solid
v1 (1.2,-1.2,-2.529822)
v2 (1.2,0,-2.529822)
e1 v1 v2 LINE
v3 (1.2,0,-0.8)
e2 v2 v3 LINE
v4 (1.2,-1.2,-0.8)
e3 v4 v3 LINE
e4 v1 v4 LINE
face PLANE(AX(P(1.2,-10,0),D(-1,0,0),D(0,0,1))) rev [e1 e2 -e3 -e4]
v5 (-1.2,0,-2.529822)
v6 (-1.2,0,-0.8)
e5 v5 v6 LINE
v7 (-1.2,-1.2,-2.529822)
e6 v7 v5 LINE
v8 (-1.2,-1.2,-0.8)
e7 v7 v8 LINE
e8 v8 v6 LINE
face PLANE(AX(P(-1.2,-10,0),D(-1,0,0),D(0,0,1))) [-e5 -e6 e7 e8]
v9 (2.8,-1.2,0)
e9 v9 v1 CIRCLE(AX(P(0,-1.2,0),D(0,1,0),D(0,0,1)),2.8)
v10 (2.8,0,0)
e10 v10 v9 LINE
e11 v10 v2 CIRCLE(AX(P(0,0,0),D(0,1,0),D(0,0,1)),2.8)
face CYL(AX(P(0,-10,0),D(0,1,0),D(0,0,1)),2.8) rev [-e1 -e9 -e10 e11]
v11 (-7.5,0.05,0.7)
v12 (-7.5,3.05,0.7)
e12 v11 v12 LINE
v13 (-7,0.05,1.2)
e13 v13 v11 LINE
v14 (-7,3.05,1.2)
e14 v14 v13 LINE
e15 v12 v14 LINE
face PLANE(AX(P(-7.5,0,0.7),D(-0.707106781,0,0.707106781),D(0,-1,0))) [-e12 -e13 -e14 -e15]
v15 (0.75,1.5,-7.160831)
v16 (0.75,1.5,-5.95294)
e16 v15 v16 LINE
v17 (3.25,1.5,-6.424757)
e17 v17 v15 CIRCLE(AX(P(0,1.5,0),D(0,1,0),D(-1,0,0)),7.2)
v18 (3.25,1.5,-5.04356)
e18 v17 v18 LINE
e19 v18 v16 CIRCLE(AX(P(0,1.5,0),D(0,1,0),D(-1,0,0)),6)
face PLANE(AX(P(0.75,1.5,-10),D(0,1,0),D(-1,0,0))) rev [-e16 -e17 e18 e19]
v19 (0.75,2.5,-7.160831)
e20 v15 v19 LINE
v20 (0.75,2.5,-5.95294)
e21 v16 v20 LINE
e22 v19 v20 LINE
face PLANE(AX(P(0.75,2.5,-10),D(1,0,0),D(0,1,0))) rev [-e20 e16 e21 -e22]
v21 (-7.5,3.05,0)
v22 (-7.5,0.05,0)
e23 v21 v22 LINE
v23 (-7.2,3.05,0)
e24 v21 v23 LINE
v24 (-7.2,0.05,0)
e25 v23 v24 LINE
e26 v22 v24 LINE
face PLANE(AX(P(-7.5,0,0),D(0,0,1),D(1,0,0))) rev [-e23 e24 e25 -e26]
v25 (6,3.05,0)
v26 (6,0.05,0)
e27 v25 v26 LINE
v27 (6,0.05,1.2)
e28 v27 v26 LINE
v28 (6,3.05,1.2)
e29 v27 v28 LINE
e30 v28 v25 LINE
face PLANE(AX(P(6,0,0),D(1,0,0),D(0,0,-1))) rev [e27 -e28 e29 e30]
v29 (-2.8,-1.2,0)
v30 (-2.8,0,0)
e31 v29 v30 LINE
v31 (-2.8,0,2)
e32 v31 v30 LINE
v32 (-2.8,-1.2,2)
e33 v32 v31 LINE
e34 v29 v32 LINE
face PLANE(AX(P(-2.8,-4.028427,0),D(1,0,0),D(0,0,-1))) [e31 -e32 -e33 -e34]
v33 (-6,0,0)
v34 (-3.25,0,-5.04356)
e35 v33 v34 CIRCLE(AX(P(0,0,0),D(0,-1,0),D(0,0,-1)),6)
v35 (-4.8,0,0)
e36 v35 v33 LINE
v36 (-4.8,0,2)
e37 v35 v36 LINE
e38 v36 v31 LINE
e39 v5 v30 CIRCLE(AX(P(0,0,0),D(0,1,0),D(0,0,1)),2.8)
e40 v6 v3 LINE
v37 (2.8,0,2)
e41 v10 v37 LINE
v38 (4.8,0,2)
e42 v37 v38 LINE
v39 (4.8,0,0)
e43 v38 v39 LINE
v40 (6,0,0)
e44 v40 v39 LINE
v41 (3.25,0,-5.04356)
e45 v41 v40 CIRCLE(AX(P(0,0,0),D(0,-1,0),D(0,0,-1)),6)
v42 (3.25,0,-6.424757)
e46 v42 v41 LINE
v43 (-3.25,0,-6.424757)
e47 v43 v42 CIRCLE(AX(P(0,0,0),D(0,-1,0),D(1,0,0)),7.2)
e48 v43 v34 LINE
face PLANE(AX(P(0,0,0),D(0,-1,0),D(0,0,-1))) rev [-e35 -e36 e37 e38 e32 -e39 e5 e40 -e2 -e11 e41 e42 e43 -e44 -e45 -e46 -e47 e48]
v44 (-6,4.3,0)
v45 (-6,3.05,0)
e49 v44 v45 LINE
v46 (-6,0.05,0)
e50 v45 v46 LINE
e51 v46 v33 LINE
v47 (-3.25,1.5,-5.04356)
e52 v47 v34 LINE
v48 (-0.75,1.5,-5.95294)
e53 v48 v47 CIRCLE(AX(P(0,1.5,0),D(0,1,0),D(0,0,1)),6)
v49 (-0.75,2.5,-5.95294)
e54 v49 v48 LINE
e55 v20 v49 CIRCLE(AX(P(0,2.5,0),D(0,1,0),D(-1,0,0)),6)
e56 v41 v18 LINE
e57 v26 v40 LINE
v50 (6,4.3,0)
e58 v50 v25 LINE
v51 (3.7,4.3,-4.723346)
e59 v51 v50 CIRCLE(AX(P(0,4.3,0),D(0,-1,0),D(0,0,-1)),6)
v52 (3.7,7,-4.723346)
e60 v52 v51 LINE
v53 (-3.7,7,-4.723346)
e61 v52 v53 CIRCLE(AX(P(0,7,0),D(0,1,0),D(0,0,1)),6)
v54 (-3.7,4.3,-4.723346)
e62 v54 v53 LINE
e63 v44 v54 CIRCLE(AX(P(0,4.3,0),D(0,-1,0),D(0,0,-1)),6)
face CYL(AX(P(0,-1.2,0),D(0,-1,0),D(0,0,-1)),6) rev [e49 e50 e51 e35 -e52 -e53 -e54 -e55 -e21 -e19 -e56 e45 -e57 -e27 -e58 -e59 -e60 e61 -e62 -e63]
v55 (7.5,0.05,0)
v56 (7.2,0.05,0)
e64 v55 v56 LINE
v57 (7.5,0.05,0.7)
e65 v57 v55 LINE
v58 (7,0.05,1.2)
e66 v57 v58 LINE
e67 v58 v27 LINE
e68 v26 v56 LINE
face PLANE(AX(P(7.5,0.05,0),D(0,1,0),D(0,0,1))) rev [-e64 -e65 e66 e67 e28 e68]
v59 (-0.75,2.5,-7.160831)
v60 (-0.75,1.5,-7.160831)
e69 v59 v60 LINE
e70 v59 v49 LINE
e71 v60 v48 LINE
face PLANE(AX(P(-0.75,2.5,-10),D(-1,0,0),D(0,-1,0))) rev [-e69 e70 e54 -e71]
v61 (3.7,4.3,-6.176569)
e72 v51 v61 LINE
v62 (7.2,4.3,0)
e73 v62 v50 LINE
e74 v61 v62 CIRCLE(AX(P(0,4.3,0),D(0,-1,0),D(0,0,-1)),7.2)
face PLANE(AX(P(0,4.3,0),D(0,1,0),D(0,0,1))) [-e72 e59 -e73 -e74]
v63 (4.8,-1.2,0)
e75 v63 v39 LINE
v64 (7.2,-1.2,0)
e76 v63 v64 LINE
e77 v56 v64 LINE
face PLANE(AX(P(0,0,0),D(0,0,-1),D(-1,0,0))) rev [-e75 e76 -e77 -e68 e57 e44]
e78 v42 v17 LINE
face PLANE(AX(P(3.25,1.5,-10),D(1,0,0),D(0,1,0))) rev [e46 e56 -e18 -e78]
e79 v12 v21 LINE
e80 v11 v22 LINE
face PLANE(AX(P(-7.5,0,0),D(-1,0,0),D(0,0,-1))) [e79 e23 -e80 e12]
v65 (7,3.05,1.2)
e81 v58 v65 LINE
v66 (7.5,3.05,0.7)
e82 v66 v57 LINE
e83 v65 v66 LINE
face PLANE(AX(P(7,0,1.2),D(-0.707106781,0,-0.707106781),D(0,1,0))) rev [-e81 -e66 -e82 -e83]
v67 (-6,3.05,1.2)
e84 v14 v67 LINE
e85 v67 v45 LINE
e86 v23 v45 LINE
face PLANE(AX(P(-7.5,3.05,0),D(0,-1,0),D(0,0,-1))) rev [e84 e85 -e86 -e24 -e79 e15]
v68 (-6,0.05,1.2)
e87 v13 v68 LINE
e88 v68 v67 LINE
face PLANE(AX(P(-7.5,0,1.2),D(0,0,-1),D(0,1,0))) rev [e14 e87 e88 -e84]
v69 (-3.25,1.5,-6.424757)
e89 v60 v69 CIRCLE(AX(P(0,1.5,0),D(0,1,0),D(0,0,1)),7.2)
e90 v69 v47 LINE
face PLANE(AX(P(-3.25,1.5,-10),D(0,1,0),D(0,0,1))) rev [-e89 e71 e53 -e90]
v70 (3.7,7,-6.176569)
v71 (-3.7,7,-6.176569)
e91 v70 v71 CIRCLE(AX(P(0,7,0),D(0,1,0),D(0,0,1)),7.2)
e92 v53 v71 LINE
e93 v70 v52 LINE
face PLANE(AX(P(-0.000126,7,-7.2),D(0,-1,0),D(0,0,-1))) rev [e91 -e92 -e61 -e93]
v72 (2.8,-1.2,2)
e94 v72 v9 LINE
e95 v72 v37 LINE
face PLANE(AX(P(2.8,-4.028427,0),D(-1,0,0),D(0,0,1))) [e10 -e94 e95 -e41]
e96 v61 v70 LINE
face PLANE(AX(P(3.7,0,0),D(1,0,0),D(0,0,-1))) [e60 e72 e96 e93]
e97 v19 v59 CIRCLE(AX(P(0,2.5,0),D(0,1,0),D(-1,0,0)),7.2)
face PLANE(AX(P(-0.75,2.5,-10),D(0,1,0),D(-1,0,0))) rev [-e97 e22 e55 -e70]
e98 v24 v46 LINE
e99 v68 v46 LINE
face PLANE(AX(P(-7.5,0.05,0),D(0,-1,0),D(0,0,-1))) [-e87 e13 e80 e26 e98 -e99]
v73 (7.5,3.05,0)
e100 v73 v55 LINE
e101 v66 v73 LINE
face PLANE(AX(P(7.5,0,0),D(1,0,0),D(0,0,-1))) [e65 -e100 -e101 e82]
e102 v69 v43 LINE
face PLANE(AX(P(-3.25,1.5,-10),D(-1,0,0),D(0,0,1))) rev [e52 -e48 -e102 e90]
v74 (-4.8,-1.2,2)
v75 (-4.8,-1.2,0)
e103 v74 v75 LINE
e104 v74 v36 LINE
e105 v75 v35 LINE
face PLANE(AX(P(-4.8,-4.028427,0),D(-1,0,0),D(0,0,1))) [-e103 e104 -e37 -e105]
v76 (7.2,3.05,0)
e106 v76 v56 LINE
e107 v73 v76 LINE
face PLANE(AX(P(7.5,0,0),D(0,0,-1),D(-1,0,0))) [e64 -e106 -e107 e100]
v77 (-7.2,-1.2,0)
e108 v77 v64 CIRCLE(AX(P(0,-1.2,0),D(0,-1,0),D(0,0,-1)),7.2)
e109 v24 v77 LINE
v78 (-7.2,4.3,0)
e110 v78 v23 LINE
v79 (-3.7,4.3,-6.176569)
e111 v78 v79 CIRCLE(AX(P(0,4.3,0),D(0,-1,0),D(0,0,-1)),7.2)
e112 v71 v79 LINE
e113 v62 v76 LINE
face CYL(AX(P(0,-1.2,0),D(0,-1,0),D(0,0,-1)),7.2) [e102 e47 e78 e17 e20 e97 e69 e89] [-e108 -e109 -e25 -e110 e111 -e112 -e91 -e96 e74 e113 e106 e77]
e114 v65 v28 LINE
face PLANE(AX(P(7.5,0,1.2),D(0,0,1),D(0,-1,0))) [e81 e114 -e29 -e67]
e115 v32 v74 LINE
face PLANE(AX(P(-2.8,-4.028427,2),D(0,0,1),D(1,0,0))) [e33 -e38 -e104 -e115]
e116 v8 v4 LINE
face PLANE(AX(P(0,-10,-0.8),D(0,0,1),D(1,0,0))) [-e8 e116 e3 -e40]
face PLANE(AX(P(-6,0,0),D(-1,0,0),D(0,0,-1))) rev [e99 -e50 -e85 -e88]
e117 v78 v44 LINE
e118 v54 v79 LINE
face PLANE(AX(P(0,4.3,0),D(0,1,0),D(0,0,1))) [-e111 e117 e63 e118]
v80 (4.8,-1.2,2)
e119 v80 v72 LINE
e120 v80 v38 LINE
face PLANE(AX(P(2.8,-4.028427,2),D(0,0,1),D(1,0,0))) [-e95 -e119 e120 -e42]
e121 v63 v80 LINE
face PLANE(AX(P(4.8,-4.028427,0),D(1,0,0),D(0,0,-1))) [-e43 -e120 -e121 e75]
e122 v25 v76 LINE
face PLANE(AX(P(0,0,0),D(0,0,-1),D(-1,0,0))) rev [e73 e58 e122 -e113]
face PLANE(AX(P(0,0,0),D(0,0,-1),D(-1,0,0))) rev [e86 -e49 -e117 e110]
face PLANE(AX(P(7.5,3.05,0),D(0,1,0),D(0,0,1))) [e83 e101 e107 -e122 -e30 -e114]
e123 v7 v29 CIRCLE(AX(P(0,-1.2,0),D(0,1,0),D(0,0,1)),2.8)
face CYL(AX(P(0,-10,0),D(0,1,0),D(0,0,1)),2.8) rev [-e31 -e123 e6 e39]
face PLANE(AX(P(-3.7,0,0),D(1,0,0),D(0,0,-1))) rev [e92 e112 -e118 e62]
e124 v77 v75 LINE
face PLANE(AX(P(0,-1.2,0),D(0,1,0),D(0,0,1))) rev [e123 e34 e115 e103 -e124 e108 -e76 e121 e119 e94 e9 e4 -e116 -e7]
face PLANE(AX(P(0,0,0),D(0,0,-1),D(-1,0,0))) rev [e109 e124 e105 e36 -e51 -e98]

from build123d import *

# Parameters (mm, degrees)
SKETCH1_W                = 6
SKETCH1_H                = 1.2
SKETCH1_W_2              = 1.2
SKETCH1_H_2              = 4.3
REVOLVE1_ANGLE           = 180
REVOLVE2_START           = 4.3
REVOLVE2_DEPTH           = 2.7
CUT_EXTRUDE1_DEPTH       = 10
CUT_EXTRUDE2_DEPTH       = 10
SKETCH5_W                = 2
SKETCH5_H                = 2
BOSS_EXTRUDE1_DEPTH      = 1.2
SKETCH6_W                = 1.2
SKETCH6_H                = 3
BOSS_EXTRUDE2_DEPTH      = 1.5
CHAMFER1_SIZE            = 0.5
CHAMFER1_OF_MIRROR1_SIZE = 0.5


# Read off the part's stored shape, not the designer's step: Revolve2
with BuildPart() as part:
    # Sketch1 → Revolve1 (revolve)
    with BuildSketch(Plane.XY):
        with Locations((3, -0.6)):
            Rectangle(SKETCH1_W, SKETCH1_H)
        with Locations((6.6, -0.6)):
            Rectangle(SKETCH1_W_2, SKETCH1_H)
        with Locations((6.6, 2.15)):
            Rectangle(SKETCH1_W_2, SKETCH1_H_2)
    revolve(axis=Axis((0, -1.2, 0), (0, 1, 0)), revolution_arc=REVOLVE1_ANGLE)

    # Revolve2 outline → Revolve2 (add)
    with BuildSketch(Plane(origin=(0, 0, 0), x_dir=(1, 0, 0), z_dir=(0, 1, 0)).offset(REVOLVE2_START)):
        with BuildLine():
            ThreePointArc((3.7, 6.176568627), (0, 7.2), (-3.7, 6.176568627))
            Line((-3.7, 6.176568627), (-3.7, 4.723346271))
            ThreePointArc((-3.7, 4.723346271), (0, 6), (3.7, 4.723346271))
            Line((3.7, 4.723346271), (3.7, 6.176568627))
        make_face()
    extrude(amount=REVOLVE2_DEPTH)

    # Sketch3 → Cut-Extrude1 (cut)
    with BuildSketch(Plane.XY):
        Polygon((-3.25, 1.5), (-0.75, 1.5), (-0.75, 2.5), (0.75, 2.5), (0.75, 1.5), (3.25, 1.5), (3.25, 0), (-3.25, 0), align=None)
    extrude(amount=-CUT_EXTRUDE1_DEPTH, mode=Mode.SUBTRACT)

    # Sketch4 → Cut-Extrude2 (cut)
    with BuildSketch(Plane(origin=(0, 0, 0), x_dir=(1, 0, 0), z_dir=(0, 1, 0))):
        with BuildLine():
            Line((-1.2, 0.8), (-1.2, 2.529822128))
            ThreePointArc((-1.2, 2.529822128), (-2.366431913, 1.496662955), (-2.8, 0))
            Line((-2.8, 0), (2.8, 0))
            ThreePointArc((2.8, 0), (2.366431913, 1.496662955), (1.2, 2.529822128))
            Line((1.2, 2.529822128), (1.2, 0.8))
            Line((1.2, 0.8), (-1.2, 0.8))
        make_face()
    extrude(amount=-CUT_EXTRUDE2_DEPTH, mode=Mode.SUBTRACT)

    # Sketch5 → Boss-Extrude1 (add)
    with BuildSketch(Plane(origin=(0, 0, 0), x_dir=(1, 0, 0), z_dir=(0, 1, 0))):
        with Locations((-3.8, -1)):
            Rectangle(SKETCH5_W, SKETCH5_H)
        with Locations((3.8, -1)):
            Rectangle(SKETCH5_W, SKETCH5_H)
    extrude(amount=-BOSS_EXTRUDE1_DEPTH)

    # Sketch6 → Boss-Extrude2 (add)
    with BuildSketch(Plane(origin=(6, 0, 0), x_dir=(0, 0, -1), z_dir=(1, 0, 0))):
        with Locations((-0.6, 1.55)):
            Rectangle(SKETCH6_W, SKETCH6_H)
    boss_extrude2 = extrude(amount=BOSS_EXTRUDE2_DEPTH)

    # Chamfer1
    chamfer1_edges = [part.edges().sort_by_distance(p)[0] for p in [
        (7.5, 1.55, 1.2),
    ]]
    chamfer(chamfer1_edges, length=CHAMFER1_SIZE)

    # Mirror1: Boss-Extrude2 across plane
    add(boss_extrude2.mirror(Plane(origin=(0, 0, 0), x_dir=(0, 0, 1), z_dir=(1, 0, 0))))

    # Chamfer1 of Mirror1
    chamfer1_of_mirror1_edges = [part.edges().sort_by_distance(p)[0] for p in [
        (-7.5, 1.55, 1.2),
    ]]
    chamfer(chamfer1_of_mirror1_edges, length=CHAMFER1_OF_MIRROR1_SIZE)


solid = part.part
